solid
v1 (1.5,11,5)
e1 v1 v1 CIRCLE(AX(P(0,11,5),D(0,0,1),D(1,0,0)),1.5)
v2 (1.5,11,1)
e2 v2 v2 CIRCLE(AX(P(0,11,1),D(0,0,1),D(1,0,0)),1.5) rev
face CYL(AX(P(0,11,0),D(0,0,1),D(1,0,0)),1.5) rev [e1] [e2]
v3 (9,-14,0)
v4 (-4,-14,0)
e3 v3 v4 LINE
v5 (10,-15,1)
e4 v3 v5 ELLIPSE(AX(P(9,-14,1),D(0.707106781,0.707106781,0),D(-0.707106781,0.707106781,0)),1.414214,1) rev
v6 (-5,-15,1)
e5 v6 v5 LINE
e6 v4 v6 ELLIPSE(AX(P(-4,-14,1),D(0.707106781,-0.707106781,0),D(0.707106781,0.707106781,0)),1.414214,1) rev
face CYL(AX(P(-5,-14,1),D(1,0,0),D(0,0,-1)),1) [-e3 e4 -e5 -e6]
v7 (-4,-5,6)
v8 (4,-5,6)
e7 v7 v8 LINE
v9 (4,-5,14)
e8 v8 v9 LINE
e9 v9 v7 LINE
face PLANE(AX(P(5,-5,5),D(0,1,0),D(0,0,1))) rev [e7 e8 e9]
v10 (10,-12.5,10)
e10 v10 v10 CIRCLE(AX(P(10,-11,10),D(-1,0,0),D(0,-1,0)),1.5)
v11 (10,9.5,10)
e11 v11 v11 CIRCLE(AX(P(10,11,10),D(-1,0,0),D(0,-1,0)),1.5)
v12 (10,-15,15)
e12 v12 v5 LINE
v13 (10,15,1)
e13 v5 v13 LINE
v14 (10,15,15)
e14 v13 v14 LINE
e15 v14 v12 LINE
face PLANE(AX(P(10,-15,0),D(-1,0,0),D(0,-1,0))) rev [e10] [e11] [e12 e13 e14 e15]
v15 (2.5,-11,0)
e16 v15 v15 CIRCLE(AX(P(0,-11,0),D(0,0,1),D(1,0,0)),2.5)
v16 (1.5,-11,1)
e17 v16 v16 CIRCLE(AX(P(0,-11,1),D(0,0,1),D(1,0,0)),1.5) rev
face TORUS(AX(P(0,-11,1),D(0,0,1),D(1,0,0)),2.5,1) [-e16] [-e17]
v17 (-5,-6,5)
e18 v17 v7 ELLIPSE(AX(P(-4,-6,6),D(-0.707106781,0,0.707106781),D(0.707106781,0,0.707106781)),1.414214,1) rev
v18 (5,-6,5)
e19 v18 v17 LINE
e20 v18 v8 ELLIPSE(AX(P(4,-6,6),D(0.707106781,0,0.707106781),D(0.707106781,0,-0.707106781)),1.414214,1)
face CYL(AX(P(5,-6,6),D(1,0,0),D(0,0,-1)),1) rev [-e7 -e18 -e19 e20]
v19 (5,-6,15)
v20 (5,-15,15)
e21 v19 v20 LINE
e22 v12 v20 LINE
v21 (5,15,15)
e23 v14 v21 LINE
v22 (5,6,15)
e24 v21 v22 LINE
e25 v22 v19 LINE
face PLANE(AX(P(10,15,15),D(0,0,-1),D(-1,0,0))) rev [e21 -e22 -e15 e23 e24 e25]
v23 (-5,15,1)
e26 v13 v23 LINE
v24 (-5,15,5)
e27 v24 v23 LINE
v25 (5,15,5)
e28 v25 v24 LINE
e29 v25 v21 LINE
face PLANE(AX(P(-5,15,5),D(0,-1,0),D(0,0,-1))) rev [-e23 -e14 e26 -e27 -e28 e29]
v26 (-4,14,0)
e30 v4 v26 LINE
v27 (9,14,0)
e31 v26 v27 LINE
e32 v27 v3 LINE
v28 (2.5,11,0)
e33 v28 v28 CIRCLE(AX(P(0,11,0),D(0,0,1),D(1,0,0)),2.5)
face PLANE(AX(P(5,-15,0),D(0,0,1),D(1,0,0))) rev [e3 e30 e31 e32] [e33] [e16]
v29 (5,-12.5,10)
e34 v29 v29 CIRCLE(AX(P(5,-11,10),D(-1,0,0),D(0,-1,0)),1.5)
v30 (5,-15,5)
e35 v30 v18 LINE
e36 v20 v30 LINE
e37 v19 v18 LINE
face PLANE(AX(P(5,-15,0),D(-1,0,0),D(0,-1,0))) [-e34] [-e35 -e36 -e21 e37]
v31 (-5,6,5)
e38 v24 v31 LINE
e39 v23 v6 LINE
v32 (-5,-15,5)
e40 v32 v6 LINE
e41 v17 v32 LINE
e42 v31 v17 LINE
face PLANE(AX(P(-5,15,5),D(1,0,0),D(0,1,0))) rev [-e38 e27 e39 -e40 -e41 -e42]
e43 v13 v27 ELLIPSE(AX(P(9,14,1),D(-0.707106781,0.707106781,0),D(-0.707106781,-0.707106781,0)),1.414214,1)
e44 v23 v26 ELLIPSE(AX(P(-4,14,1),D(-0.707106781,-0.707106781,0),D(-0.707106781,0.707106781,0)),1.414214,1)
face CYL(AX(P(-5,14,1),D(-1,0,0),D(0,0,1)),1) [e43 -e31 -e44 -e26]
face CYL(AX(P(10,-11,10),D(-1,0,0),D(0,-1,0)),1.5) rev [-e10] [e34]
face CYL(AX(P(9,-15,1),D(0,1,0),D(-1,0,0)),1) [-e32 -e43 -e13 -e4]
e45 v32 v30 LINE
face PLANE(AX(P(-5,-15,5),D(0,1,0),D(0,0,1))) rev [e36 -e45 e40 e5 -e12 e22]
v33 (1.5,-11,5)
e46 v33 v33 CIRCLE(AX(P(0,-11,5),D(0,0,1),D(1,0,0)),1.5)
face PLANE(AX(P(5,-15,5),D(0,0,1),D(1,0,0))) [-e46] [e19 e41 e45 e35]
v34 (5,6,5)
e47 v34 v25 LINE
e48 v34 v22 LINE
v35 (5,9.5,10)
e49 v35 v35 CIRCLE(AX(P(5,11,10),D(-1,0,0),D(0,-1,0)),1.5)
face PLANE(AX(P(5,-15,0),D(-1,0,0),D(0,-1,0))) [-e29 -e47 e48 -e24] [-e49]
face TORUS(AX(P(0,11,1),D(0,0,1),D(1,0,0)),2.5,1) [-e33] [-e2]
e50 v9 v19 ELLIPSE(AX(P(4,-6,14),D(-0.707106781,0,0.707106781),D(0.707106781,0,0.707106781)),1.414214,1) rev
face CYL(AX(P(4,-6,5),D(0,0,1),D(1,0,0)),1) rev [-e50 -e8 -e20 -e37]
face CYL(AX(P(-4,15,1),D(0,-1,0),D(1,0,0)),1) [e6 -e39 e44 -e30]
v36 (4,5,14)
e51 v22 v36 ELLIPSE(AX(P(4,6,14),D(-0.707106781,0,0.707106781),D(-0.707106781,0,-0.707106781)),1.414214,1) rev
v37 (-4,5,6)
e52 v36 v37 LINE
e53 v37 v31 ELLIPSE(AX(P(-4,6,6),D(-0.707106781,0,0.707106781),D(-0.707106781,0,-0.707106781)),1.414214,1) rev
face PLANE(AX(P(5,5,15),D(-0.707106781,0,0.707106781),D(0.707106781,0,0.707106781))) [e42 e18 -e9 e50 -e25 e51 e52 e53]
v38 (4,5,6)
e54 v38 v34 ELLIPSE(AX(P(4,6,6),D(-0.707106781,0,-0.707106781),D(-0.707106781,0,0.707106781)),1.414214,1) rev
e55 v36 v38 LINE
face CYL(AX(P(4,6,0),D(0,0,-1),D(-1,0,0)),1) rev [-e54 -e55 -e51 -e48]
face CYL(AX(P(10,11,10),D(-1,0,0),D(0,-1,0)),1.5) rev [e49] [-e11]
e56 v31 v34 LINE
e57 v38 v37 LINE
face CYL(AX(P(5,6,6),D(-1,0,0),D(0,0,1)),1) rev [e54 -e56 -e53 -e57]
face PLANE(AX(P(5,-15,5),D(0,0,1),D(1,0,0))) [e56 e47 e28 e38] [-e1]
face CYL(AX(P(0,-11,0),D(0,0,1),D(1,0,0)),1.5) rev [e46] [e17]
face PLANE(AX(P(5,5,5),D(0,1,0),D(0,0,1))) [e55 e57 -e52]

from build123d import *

# Parameters (mm, degrees)
SKETCH_1_W           = 10
SKETCH_1_H           = 30
EXTRUDE_1_DEPTH      = 5
SKETCH_2_W           = 15
SKETCH_2_H           = 30
EXTRUDE_2_DEPTH      = 5
SKETCH_4_R           = 1.5
CUT_EXTRUDE_1_DEPTH  = 21.615528128
EXTRUDE_3_DEPTH      = 5
EXTRUDE_3_DEPTH_BACK = 5
SKETCH_3_R           = 1.5
CUT_EXTRUDE_2_DEPTH  = 5
FILLET_1_R           = 1
FILLET_2_R           = 1


with BuildPart() as part:
    # 草圖1 → 填料-伸長1 (new body)
    with BuildSketch(Plane.XY):
        Rectangle(SKETCH_1_W, SKETCH_1_H)
    extrude(amount=EXTRUDE_1_DEPTH)

    # 草圖2 → 填料-伸長2 (add)
    with BuildSketch(Plane(origin=(5, 0, 0), x_dir=(0, 0, -1), z_dir=(1, 0, 0))):
        with Locations((-7.5, 0)):
            Rectangle(SKETCH_2_W, SKETCH_2_H)
    extrude(amount=EXTRUDE_2_DEPTH)

    # 草圖4 → 除料-伸長1 (cut, through all)
    with BuildSketch(Plane.XY.offset(5)):
        with Locations((0, 11)):
            Circle(SKETCH_4_R)
        with Locations((0, -11)):
            Circle(SKETCH_4_R)
    extrude(amount=-CUT_EXTRUDE_1_DEPTH, mode=Mode.SUBTRACT)

    # 草圖5 → 填料-伸長3 (add, two sides: drawn at the far end of the back side and taken through both)
    with BuildSketch(Plane.XZ.offset(-EXTRUDE_3_DEPTH_BACK)):
        Polygon((5, 15), (-5, 5), (5, 5), align=None)
    extrude(amount=EXTRUDE_3_DEPTH + EXTRUDE_3_DEPTH_BACK)

    # 草圖3 → 除料-伸長2 (cut)
    with BuildSketch(Plane.ZY.offset(-5)):
        with Locations(Location((10, 11, 0), (0, 0, 270))):
            Circle(SKETCH_3_R)
        with Locations(Location((10, -11, 0), (0, 0, 270))):
            Circle(SKETCH_3_R)
    extrude(amount=-CUT_EXTRUDE_2_DEPTH, mode=Mode.SUBTRACT)

    # 圓角1
    fillet_1_edges = [part.edges().sort_by_distance(p)[0] for p in [
        (10, 0, 0),
        (-1.5, 11, 0),
        (-1.5, -11, 0),
        (2.5, -15, 0),
        (-5, 0, 0),
        (2.5, 15, 0),
    ]]
    fillet(fillet_1_edges, radius=FILLET_1_R)

    # 圓角2
    # the kernel refuses this fillet: 1 mm, written as the material it adds along each edge
    with BuildSketch(Plane(origin=(-5, -5, 5), x_dir=(0, -1, 0), z_dir=(1, 0, 0))) as fillet_2_piece_1_section:
        with BuildLine():
            CenterArc((FILLET_2_R, -FILLET_2_R), FILLET_2_R, 90, 90)
            Line((0, -FILLET_2_R), (0, 0))
            Line((0, 0), (FILLET_2_R, 0))
        make_face()
    fillet_2_piece_1 = extrude(amount=12.5, mode=Mode.PRIVATE)
    fillet_2_piece_1 = split(fillet_2_piece_1, bisect_by=Plane(origin=(-2.333551082, -5.229183037, 7.666448918), z_dir=(0.7071067811865476, 0, -0.7071067811865475)), keep=Keep.TOP, mode=Mode.PRIVATE)
    add(fillet_2_piece_1)
    with BuildSketch(Plane(origin=(5, -5, 2.5), x_dir=(0, -1, 0), z_dir=(0, 0, 1))) as fillet_2_piece_2_section:
        with BuildLine():
            CenterArc((FILLET_2_R, -FILLET_2_R), FILLET_2_R, 90, 90)
            Line((0, -FILLET_2_R), (0, 0))
            Line((0, 0), (FILLET_2_R, 0))
        make_face()
    fillet_2_piece_2 = extrude(amount=12.5, mode=Mode.PRIVATE)
    fillet_2_piece_2 = split(fillet_2_piece_2, bisect_by=Plane(origin=(-0.738197557, -5.226395114, 9.261802443), z_dir=(0.7071067811865476, 0, -0.7071067811865475)), keep=Keep.TOP, mode=Mode.PRIVATE)
    add(fillet_2_piece_2)
    with BuildSketch(Plane(origin=(-5, 5, 5), x_dir=(0, 1, 0), z_dir=(1, 0, 0))) as fillet_2_piece_3_section:
        with BuildLine():
            CenterArc((FILLET_2_R, FILLET_2_R), FILLET_2_R, 180, 90)
            Line((0, FILLET_2_R), (0, 0))
            Line((0, 0), (FILLET_2_R, 0))
        make_face()
    fillet_2_piece_3 = extrude(amount=12.5, mode=Mode.PRIVATE)
    fillet_2_piece_3 = split(fillet_2_piece_3, bisect_by=Plane(origin=(-2.333551082, 5.229183037, 7.666448918), z_dir=(0.7071067811865476, 0, -0.7071067811865475)), keep=Keep.TOP, mode=Mode.PRIVATE)
    add(fillet_2_piece_3)
    with BuildSketch(Plane(origin=(5, 5, 2.5), x_dir=(0, 1, 0), z_dir=(0, 0, 1))) as fillet_2_piece_4_section:
        with BuildLine():
            CenterArc((FILLET_2_R, FILLET_2_R), FILLET_2_R, 180, 90)
            Line((0, FILLET_2_R), (0, 0))
            Line((0, 0), (FILLET_2_R, 0))
        make_face()
    fillet_2_piece_4 = extrude(amount=12.5, mode=Mode.PRIVATE)
    fillet_2_piece_4 = split(fillet_2_piece_4, bisect_by=Plane(origin=(-0.738197557, 5.226395114, 9.261802443), z_dir=(0.7071067811865476, 0, -0.7071067811865475)), keep=Keep.TOP, mode=Mode.PRIVATE)
    add(fillet_2_piece_4)


solid = part.part
